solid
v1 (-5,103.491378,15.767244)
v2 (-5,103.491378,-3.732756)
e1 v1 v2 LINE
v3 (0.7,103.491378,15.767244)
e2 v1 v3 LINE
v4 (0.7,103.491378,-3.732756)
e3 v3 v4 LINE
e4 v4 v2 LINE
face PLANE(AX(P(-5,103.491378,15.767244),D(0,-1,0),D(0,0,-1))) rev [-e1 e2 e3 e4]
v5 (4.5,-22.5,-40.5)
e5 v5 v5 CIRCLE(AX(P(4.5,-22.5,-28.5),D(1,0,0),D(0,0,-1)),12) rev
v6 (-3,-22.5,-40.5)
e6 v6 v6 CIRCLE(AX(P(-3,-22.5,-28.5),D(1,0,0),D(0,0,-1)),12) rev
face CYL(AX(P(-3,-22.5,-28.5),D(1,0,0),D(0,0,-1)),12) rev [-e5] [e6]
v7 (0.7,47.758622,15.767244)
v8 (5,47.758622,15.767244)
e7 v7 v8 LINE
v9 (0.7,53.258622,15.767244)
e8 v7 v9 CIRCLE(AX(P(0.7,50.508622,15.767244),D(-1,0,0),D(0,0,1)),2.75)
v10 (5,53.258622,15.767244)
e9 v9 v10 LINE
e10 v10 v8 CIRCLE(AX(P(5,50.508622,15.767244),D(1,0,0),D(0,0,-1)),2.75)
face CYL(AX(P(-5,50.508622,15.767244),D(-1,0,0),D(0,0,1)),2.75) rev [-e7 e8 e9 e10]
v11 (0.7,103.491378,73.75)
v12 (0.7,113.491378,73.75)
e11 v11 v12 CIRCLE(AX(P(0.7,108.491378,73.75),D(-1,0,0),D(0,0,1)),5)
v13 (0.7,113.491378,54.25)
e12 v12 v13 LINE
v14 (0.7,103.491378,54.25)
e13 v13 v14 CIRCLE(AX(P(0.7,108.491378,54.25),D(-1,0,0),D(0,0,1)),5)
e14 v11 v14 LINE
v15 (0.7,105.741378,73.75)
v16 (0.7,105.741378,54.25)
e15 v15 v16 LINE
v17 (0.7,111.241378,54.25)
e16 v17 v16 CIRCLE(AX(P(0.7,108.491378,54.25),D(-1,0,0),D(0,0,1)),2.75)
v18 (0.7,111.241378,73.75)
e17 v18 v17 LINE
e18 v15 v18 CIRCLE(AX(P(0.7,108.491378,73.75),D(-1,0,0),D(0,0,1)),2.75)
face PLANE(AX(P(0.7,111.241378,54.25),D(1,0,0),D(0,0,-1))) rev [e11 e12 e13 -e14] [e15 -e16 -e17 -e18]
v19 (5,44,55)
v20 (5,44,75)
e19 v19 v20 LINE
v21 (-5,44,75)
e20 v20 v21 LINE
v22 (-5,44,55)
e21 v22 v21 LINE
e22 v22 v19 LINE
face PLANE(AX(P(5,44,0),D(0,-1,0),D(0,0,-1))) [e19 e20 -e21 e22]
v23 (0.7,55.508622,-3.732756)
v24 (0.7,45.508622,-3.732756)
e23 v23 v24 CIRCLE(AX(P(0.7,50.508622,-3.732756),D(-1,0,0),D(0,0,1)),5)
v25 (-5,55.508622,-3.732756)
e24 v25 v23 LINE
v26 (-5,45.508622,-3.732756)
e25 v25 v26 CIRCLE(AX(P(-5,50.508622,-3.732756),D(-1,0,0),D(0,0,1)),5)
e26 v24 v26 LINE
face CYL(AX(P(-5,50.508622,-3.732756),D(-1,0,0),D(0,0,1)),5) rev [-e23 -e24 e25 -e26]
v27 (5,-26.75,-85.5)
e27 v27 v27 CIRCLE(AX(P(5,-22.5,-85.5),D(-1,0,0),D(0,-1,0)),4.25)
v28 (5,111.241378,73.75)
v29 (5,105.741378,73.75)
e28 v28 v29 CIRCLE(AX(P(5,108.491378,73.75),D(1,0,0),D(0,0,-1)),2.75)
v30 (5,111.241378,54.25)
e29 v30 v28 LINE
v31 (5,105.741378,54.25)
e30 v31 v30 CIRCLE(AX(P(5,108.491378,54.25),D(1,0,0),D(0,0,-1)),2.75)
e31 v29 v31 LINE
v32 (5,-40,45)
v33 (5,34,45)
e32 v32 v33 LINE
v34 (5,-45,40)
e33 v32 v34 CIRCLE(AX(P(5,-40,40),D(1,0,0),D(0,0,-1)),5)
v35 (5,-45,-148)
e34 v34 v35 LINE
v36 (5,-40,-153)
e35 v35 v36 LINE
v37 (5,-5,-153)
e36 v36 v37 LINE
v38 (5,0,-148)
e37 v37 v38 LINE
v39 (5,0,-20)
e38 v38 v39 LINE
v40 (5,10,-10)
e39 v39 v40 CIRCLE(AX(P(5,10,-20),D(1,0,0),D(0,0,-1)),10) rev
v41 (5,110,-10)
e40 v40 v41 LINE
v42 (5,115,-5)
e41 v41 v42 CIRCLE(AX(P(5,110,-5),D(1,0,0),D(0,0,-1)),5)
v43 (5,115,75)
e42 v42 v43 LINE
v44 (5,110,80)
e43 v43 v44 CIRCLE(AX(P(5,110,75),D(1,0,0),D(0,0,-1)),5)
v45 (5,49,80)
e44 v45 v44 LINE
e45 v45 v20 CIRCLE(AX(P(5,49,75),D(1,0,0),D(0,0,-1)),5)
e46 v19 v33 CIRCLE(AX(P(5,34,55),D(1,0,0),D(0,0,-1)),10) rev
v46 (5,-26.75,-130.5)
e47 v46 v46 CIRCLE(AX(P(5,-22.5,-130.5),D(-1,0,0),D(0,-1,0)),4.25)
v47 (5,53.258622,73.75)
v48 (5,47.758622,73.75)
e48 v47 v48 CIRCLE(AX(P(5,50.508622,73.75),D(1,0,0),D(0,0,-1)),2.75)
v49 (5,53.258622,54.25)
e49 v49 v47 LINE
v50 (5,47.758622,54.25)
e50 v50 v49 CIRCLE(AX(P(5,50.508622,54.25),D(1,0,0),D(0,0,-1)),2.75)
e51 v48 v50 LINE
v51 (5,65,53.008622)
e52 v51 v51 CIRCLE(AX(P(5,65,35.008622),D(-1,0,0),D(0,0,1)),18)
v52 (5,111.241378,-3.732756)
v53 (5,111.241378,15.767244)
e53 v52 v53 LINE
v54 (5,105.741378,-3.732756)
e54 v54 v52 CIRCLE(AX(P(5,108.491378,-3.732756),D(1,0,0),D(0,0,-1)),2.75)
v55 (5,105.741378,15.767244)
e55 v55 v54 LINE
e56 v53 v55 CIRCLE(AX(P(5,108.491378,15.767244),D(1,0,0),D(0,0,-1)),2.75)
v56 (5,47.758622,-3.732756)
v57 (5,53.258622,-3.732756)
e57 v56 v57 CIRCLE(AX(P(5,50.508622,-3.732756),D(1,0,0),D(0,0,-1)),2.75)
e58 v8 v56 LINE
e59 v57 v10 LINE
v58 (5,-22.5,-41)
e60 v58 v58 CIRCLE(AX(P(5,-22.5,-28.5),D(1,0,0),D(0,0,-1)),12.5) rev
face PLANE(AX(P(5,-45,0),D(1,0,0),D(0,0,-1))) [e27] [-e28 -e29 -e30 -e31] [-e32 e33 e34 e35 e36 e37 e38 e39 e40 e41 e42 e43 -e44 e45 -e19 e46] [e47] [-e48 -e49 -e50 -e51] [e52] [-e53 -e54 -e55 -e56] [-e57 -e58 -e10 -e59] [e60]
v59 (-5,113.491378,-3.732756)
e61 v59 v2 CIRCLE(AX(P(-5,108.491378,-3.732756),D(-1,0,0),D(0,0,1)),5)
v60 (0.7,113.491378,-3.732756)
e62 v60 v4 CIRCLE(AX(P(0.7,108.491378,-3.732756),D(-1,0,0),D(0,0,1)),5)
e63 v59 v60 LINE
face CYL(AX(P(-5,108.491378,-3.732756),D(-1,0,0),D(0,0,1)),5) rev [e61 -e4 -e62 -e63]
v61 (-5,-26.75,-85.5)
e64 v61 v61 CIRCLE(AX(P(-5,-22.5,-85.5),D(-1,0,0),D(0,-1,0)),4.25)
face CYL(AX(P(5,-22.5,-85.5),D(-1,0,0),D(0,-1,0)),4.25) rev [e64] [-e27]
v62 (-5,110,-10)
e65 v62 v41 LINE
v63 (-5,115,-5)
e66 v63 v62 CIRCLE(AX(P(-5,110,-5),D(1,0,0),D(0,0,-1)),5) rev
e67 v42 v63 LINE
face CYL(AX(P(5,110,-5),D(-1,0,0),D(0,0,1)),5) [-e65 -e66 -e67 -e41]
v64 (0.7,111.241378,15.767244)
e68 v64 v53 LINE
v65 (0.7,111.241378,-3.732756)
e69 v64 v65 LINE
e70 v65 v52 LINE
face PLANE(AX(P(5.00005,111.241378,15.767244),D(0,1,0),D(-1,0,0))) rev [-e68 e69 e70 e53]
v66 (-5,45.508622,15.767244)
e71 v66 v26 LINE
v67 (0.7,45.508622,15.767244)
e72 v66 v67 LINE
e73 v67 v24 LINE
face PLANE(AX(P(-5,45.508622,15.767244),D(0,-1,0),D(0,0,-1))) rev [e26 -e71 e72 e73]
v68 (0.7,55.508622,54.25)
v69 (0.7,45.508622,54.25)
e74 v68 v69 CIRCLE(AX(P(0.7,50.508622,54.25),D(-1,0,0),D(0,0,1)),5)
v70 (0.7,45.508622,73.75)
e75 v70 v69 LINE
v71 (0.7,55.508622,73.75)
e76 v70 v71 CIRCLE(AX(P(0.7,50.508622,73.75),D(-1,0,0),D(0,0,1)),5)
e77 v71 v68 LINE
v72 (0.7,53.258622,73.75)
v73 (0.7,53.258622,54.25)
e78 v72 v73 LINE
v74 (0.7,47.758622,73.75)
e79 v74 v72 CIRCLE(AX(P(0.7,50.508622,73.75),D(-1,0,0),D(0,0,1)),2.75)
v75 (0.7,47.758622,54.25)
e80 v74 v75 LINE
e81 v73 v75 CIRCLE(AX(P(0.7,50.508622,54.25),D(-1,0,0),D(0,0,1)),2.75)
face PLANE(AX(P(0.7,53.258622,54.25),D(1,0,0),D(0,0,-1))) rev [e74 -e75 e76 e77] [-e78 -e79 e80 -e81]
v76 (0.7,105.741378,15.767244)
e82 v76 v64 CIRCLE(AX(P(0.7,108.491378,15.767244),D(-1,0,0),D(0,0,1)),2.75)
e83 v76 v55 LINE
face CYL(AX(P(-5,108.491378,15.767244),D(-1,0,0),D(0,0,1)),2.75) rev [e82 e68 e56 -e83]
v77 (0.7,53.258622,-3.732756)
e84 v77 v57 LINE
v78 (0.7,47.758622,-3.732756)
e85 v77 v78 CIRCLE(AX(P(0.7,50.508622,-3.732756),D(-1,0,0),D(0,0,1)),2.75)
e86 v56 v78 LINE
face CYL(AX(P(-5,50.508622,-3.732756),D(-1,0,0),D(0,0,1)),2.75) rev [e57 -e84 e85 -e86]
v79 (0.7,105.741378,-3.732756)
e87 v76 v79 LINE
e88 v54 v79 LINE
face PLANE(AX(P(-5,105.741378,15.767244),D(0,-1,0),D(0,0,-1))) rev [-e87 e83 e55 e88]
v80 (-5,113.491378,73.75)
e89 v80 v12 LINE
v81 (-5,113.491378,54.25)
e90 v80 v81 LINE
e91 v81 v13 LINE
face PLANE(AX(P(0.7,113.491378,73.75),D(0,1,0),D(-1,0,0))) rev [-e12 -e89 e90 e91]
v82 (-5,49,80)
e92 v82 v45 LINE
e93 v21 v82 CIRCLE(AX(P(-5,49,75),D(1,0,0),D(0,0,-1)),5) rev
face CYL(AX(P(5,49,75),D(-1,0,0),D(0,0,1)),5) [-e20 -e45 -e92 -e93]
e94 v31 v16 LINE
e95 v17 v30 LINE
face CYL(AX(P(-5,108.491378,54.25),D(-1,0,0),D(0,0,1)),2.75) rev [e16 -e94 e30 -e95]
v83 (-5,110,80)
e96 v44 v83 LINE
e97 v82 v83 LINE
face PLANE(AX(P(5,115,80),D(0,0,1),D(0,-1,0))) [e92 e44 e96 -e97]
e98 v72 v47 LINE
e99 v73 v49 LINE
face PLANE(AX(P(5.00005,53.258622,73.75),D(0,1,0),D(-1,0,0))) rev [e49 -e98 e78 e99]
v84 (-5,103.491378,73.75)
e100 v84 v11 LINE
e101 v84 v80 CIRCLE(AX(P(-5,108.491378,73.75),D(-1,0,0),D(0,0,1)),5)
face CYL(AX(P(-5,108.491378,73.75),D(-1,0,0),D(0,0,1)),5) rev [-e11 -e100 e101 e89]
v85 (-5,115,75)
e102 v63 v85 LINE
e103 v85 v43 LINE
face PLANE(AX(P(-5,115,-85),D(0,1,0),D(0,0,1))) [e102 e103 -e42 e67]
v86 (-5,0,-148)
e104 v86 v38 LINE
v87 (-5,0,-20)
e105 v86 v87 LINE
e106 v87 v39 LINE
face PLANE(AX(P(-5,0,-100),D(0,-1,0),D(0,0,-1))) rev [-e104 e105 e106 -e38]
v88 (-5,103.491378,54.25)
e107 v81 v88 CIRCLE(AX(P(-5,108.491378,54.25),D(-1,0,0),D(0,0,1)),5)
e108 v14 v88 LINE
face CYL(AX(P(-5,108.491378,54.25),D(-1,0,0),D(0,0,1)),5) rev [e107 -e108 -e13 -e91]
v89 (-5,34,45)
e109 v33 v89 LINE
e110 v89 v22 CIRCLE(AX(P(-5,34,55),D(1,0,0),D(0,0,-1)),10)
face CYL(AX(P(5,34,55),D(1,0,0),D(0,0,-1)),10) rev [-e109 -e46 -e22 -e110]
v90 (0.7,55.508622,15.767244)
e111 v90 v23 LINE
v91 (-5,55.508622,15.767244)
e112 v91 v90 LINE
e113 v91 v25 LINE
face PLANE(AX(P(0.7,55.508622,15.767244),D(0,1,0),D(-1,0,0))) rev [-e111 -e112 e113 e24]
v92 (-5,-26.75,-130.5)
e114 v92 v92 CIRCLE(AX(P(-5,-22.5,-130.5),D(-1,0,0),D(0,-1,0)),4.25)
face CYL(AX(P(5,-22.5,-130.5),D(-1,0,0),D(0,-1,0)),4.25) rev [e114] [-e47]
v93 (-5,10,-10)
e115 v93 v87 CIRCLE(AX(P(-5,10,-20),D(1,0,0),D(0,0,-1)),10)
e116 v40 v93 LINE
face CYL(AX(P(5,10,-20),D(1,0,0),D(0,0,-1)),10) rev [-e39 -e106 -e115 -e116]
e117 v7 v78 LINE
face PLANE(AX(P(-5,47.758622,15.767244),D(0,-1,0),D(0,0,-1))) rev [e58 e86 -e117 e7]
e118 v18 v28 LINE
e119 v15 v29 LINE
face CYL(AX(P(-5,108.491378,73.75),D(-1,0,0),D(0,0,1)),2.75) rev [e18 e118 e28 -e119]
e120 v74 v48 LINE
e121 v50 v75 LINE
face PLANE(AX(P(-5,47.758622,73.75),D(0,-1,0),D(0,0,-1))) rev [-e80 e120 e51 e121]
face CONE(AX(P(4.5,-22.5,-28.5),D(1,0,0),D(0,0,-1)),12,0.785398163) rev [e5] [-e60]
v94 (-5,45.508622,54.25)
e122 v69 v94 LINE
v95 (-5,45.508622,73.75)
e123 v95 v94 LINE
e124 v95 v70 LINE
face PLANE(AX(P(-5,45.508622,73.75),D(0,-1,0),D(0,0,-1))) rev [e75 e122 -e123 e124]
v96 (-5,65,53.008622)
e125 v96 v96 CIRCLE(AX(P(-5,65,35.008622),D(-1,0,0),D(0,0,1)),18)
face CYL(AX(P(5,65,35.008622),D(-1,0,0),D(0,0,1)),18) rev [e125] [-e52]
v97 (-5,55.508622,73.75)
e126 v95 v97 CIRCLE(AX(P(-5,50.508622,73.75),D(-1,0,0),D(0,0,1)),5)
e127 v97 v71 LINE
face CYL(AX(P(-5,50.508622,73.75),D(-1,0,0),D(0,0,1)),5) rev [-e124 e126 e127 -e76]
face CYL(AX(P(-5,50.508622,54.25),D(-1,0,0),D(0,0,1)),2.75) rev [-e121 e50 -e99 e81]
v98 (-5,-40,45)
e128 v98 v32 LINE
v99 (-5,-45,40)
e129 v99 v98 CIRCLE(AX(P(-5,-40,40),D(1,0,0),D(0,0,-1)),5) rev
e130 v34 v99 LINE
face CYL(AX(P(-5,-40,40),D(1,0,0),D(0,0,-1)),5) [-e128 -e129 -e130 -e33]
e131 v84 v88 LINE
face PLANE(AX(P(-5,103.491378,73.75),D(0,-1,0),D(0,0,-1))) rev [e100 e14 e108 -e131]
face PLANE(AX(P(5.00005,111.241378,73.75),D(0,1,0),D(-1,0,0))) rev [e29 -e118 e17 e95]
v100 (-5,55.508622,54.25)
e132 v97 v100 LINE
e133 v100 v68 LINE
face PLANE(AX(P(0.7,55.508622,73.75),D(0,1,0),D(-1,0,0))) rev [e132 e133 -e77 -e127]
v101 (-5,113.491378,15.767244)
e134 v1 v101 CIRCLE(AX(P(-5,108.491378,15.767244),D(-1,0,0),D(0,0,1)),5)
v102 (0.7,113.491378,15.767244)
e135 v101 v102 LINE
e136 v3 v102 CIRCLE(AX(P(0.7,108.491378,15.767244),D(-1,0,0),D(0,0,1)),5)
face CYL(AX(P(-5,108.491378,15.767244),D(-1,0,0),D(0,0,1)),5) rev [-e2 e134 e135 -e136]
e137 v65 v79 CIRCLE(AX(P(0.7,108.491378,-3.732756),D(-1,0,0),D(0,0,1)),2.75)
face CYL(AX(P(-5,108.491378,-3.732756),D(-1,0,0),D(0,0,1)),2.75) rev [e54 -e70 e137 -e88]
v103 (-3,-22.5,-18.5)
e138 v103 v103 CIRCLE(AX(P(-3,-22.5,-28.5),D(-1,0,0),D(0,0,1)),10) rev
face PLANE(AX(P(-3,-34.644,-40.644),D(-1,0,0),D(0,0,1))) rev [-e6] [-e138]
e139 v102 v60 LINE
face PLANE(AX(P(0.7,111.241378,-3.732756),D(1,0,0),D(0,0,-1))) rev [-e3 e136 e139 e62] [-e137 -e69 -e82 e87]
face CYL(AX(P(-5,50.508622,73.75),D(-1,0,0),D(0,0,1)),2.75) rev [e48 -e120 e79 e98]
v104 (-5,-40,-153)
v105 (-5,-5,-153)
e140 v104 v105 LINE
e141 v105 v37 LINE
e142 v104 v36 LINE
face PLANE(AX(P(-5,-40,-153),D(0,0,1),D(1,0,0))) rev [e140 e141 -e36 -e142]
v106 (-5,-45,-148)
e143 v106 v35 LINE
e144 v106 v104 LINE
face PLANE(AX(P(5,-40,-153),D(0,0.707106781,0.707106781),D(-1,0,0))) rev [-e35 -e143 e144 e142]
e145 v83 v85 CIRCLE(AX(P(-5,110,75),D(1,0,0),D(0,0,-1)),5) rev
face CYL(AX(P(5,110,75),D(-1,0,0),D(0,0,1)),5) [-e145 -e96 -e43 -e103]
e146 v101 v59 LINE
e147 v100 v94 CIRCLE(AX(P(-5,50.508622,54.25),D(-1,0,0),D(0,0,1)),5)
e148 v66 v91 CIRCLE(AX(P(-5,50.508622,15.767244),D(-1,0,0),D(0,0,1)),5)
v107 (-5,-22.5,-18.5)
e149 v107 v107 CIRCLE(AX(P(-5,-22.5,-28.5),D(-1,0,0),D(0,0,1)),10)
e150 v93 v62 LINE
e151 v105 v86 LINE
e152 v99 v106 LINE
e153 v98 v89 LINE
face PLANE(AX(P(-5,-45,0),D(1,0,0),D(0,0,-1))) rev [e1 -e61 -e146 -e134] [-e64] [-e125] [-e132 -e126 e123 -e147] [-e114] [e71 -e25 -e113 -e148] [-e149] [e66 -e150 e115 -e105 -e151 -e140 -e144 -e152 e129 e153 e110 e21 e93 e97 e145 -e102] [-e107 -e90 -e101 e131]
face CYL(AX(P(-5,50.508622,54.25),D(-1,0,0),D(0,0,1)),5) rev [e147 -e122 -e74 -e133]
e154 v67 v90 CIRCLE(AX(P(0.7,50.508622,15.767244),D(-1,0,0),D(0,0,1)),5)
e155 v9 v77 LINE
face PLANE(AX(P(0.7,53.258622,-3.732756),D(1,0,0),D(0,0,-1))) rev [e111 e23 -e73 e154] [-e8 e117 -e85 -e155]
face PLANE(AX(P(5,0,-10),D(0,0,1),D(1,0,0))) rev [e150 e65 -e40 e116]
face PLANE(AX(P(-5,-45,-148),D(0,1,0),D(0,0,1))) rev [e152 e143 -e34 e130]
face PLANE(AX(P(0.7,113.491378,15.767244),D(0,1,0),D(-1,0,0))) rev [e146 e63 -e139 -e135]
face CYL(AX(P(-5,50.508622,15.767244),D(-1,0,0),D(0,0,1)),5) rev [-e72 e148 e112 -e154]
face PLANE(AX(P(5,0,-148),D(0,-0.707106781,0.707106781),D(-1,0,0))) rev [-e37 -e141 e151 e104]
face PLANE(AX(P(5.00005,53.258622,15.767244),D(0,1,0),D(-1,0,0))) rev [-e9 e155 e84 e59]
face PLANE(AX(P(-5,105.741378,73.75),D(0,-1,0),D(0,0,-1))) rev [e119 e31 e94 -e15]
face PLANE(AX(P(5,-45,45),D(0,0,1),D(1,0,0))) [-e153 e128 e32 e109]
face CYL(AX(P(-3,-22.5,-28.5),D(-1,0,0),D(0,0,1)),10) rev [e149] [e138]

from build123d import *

# Parameters (mm, degrees)
EXTRUDE_1_OUTLINE_W     = 2
EXTRUDE_1_OUTLINE_H     = 2
EXTRUDE_START           = -5
EXTRUDE_1_2_OUTLINE_R   = 4.25
EXTRUDE_1_2_OUTLINE_R_2 = 12
EXTRUDE_1_2_DEPTH       = 10
SKETCH_2_W              = 80
SKETCH_2_H              = 71
EXTRUDE_2_DEPTH         = 10
HOLE_START              = -6
HOLE_WIZARD_4_DEPTH     = 6.7
HOLE_START_2            = 0.7
HOLE_WIZARD_4_2_DEPTH   = 5.3
SKETCH_7_R              = 18
CUT_EXTRUDE_1_DEPTH     = 10
FILLET_2_R              = 5
FILLET_3_R              = 5
SKETCH_8_W              = 52.674698886
SKETCH_8_H              = 88.999999996
EXTRUDE_3_DEPTH         = 10
SKETCH_9_W              = 90.000000011
SKETCH_9_H              = 126.81088124
CUT_EXTRUDE_2_DEPTH     = 10
FILLET_4_R              = 10
FILLET_6_R              = 5


with BuildPart() as part:
    # 凸台-拉伸1: read off the stored shape, not the designer's step
    # 凸台-拉伸1 outline → 凸台-拉伸1 (revolve)
    with BuildSketch(Plane(origin=(0, -22.5, -28.5), x_dir=(0, 1, 0), z_dir=(0, 0, -1))):
        with Locations((11, -4)):
            Rectangle(EXTRUDE_1_OUTLINE_W, EXTRUDE_1_OUTLINE_H)
    revolve(axis=Axis((0, -22.5, -28.5), (1, 0, 0)))

    # Extrude 1 2 outline → Extrude 1 2 (add)
    with BuildSketch(Plane.YZ.offset(EXTRUDE_START)):
        with BuildLine():
            Line((114.999999996, 0), (-40, 0))
            ThreePointArc((-40, 0), (-43.535533906, -1.464466094), (-45, -5))
            Line((-45, -5), (-45, -148))
            Line((-45, -148), (-40, -153))
            Line((-40, -153), (-5, -153))
            Line((-5, -153), (1.7e-08, -147.999999983))
            Line((1.7e-08, -147.999999983), (0, -100))
            ThreePointArc((0, -100), (2.928932188, -92.928932188), (10, -90))
            Line((10, -90), (114.999999996, -90))
            Line((114.999999996, -90), (114.999999996, 0))
        make_face()
        with Locations((-22.5, -130.5)):
            Circle(EXTRUDE_1_2_OUTLINE_R, mode=Mode.SUBTRACT)
        with Locations((-22.5, -85.5)):
            Circle(EXTRUDE_1_2_OUTLINE_R, mode=Mode.SUBTRACT)
        with Locations((-22.5, -28.5)):
            Circle(EXTRUDE_1_2_OUTLINE_R_2, mode=Mode.SUBTRACT)
    extrude(amount=EXTRUDE_1_2_DEPTH)

    # Extrude 1 3 outline → Extrude 1 3 (revolve, cut)
    with BuildSketch(Plane(origin=(0, -22.5, -28.5), x_dir=(0, 1, 0), z_dir=(0, 0, -1))):
        Polygon((12, 5), (12, 4.5), (12.5, 5), align=None)
    revolve(axis=Axis((0, -22.5, -28.5), (1, 0, 0)), mode=Mode.SUBTRACT)

    # 草图2 → 凸台-拉伸2 (add)
    with BuildSketch(Plane.ZY.offset(5)):
        with Locations((40, 79.499999996)):
            Rectangle(SKETCH_2_W, SKETCH_2_H)
    extrude(amount=-EXTRUDE_2_DEPTH)

    # 打孔尺寸(%根据)内六角圆柱头螺钉的类型4: read off the stored shape, not the designer's step
    # 打孔尺寸(%根据)内六角圆柱头螺钉的类型4 outline → 打孔尺寸(%根据)内六角圆柱头螺钉的类型4 (cut)
    with BuildSketch(Plane.YZ.offset(HOLE_START)):
        with BuildLine():
            ThreePointArc((45.508621967, -3.732756057), (50.508621967, -8.732756057), (55.508621967, -3.732756057))
            Line((55.508621967, -3.732756057), (55.508621967, 15.767243943))
            ThreePointArc((55.508621967, 15.767243943), (50.508621967, 20.767243943), (45.508621967, 15.767243943))
            Line((45.508621967, 15.767243943), (45.508621967, -3.732756057))
        make_face()
        with BuildLine():
            ThreePointArc((55.508621967, 73.75), (50.508621967, 78.75), (45.508621967, 73.75))
            Line((45.508621967, 73.75), (45.508621967, 54.25))
            ThreePointArc((45.508621967, 54.25), (50.508621967, 49.25), (55.508621967, 54.25))
            Line((55.508621967, 54.25), (55.508621967, 73.75))
        make_face()
        with BuildLine():
            ThreePointArc((103.491378024, 54.25), (108.491378024, 49.25), (113.491378024, 54.25))
            Line((113.491378024, 54.25), (113.491378024, 73.75))
            ThreePointArc((113.491378024, 73.75), (108.491378024, 78.75), (103.491378024, 73.75))
            Line((103.491378024, 73.75), (103.491378024, 54.25))
        make_face()
        with BuildLine():
            ThreePointArc((113.491378024, 15.767243943), (108.491378024, 20.767243943), (103.491378024, 15.767243943))
            Line((103.491378024, 15.767243943), (103.491378024, -3.732756057))
            ThreePointArc((103.491378024, -3.732756057), (108.491378024, -8.732756057), (113.491378024, -3.732756057))
            Line((113.491378024, -3.732756057), (113.491378024, 15.767243943))
        make_face()
    extrude(amount=HOLE_WIZARD_4_DEPTH, mode=Mode.SUBTRACT)

    # Hole Wizard 4 2 outline → Hole Wizard 4 2 (cut)
    with BuildSketch(Plane.YZ.offset(HOLE_START_2)):
        with BuildLine():
            ThreePointArc((47.758621967, -3.732756057), (50.508621967, -6.482756057), (53.258621967, -3.732756057))
            Line((53.258621967, -3.732756057), (53.258621967, 15.767243943))
            ThreePointArc((53.258621967, 15.767243943), (50.508621967, 18.517243943), (47.758621967, 15.767243943))
            Line((47.758621967, 15.767243943), (47.758621967, -3.732756057))
        make_face()
        with BuildLine():
            ThreePointArc((53.258621967, 73.75), (50.508621967, 76.5), (47.758621967, 73.75))
            Line((47.758621967, 73.75), (47.758621967, 54.25))
            ThreePointArc((47.758621967, 54.25), (50.508621967, 51.5), (53.258621967, 54.25))
            Line((53.258621967, 54.25), (53.258621967, 73.75))
        make_face()
        with BuildLine():
            ThreePointArc((105.741378024, 54.25), (108.491378024, 51.5), (111.241378024, 54.25))
            Line((111.241378024, 54.25), (111.241378024, 73.75))
            ThreePointArc((111.241378024, 73.75), (108.491378024, 76.5), (105.741378024, 73.75))
            Line((105.741378024, 73.75), (105.741378024, 54.25))
        make_face()
        with BuildLine():
            ThreePointArc((111.241378024, 15.767243943), (108.491378024, 18.517243943), (105.741378024, 15.767243943))
            Line((105.741378024, 15.767243943), (105.741378024, -3.732756057))
            ThreePointArc((105.741378024, -3.732756057), (108.491378024, -6.482756057), (111.241378024, -3.732756057))
            Line((111.241378024, -3.732756057), (111.241378024, 15.767243943))
        make_face()
    extrude(amount=HOLE_WIZARD_4_2_DEPTH, mode=Mode.SUBTRACT)

    # 草图7 → 切除-拉伸1 (cut)
    with BuildSketch(Plane.ZY.offset(5)):
        with Locations((35.008621971, 64.999999996)):
            Circle(SKETCH_7_R)
    extrude(amount=-CUT_EXTRUDE_1_DEPTH, mode=Mode.SUBTRACT)

    # 圆角2
    fillet_2_edges = [part.edges().sort_by_distance(p)[0] for p in [
        (0, 114.999999996, -90),
        (0, 114.999999996, 80),
        (0, 43.999999996, 80),
    ]]
    fillet(fillet_2_edges, radius=FILLET_2_R)

    # 圆角3
    fillet_3_edges = [part.edges().sort_by_distance(p)[0] for p in [
        (0, 43.999999996, 0),
    ]]
    fillet(fillet_3_edges, radius=FILLET_3_R)

    # 草图8 → 凸台-拉伸3 (add)
    with BuildSketch(Plane.ZY.offset(5)):
        with Locations((18.662650557, -0.500000002)):
            Rectangle(SKETCH_8_W, SKETCH_8_H)
    extrude(amount=-EXTRUDE_3_DEPTH)

    # 草图9 → 切除-拉伸2 (cut)
    with BuildSketch(Plane.ZY.offset(5)):
        with Locations((-54.999999997, 63.40544062)):
            Rectangle(SKETCH_9_W, SKETCH_9_H)
    extrude(amount=-CUT_EXTRUDE_2_DEPTH, mode=Mode.SUBTRACT)

    # 圆角4
    fillet_4_edges = [part.edges().sort_by_distance(p)[0] for p in [
        (0, 43.999999996, 45),
        (0, 0, -9.999999991),
    ]]
    fillet(fillet_4_edges, radius=FILLET_4_R)

    # 圆角6
    fillet_6_edges = [part.edges().sort_by_distance(p)[0] for p in [
        (0, -45, 45),
        (0, 114.999999996, -9.999999991),
    ]]
    fillet(fillet_6_edges, radius=FILLET_6_R)


solid = part.part
